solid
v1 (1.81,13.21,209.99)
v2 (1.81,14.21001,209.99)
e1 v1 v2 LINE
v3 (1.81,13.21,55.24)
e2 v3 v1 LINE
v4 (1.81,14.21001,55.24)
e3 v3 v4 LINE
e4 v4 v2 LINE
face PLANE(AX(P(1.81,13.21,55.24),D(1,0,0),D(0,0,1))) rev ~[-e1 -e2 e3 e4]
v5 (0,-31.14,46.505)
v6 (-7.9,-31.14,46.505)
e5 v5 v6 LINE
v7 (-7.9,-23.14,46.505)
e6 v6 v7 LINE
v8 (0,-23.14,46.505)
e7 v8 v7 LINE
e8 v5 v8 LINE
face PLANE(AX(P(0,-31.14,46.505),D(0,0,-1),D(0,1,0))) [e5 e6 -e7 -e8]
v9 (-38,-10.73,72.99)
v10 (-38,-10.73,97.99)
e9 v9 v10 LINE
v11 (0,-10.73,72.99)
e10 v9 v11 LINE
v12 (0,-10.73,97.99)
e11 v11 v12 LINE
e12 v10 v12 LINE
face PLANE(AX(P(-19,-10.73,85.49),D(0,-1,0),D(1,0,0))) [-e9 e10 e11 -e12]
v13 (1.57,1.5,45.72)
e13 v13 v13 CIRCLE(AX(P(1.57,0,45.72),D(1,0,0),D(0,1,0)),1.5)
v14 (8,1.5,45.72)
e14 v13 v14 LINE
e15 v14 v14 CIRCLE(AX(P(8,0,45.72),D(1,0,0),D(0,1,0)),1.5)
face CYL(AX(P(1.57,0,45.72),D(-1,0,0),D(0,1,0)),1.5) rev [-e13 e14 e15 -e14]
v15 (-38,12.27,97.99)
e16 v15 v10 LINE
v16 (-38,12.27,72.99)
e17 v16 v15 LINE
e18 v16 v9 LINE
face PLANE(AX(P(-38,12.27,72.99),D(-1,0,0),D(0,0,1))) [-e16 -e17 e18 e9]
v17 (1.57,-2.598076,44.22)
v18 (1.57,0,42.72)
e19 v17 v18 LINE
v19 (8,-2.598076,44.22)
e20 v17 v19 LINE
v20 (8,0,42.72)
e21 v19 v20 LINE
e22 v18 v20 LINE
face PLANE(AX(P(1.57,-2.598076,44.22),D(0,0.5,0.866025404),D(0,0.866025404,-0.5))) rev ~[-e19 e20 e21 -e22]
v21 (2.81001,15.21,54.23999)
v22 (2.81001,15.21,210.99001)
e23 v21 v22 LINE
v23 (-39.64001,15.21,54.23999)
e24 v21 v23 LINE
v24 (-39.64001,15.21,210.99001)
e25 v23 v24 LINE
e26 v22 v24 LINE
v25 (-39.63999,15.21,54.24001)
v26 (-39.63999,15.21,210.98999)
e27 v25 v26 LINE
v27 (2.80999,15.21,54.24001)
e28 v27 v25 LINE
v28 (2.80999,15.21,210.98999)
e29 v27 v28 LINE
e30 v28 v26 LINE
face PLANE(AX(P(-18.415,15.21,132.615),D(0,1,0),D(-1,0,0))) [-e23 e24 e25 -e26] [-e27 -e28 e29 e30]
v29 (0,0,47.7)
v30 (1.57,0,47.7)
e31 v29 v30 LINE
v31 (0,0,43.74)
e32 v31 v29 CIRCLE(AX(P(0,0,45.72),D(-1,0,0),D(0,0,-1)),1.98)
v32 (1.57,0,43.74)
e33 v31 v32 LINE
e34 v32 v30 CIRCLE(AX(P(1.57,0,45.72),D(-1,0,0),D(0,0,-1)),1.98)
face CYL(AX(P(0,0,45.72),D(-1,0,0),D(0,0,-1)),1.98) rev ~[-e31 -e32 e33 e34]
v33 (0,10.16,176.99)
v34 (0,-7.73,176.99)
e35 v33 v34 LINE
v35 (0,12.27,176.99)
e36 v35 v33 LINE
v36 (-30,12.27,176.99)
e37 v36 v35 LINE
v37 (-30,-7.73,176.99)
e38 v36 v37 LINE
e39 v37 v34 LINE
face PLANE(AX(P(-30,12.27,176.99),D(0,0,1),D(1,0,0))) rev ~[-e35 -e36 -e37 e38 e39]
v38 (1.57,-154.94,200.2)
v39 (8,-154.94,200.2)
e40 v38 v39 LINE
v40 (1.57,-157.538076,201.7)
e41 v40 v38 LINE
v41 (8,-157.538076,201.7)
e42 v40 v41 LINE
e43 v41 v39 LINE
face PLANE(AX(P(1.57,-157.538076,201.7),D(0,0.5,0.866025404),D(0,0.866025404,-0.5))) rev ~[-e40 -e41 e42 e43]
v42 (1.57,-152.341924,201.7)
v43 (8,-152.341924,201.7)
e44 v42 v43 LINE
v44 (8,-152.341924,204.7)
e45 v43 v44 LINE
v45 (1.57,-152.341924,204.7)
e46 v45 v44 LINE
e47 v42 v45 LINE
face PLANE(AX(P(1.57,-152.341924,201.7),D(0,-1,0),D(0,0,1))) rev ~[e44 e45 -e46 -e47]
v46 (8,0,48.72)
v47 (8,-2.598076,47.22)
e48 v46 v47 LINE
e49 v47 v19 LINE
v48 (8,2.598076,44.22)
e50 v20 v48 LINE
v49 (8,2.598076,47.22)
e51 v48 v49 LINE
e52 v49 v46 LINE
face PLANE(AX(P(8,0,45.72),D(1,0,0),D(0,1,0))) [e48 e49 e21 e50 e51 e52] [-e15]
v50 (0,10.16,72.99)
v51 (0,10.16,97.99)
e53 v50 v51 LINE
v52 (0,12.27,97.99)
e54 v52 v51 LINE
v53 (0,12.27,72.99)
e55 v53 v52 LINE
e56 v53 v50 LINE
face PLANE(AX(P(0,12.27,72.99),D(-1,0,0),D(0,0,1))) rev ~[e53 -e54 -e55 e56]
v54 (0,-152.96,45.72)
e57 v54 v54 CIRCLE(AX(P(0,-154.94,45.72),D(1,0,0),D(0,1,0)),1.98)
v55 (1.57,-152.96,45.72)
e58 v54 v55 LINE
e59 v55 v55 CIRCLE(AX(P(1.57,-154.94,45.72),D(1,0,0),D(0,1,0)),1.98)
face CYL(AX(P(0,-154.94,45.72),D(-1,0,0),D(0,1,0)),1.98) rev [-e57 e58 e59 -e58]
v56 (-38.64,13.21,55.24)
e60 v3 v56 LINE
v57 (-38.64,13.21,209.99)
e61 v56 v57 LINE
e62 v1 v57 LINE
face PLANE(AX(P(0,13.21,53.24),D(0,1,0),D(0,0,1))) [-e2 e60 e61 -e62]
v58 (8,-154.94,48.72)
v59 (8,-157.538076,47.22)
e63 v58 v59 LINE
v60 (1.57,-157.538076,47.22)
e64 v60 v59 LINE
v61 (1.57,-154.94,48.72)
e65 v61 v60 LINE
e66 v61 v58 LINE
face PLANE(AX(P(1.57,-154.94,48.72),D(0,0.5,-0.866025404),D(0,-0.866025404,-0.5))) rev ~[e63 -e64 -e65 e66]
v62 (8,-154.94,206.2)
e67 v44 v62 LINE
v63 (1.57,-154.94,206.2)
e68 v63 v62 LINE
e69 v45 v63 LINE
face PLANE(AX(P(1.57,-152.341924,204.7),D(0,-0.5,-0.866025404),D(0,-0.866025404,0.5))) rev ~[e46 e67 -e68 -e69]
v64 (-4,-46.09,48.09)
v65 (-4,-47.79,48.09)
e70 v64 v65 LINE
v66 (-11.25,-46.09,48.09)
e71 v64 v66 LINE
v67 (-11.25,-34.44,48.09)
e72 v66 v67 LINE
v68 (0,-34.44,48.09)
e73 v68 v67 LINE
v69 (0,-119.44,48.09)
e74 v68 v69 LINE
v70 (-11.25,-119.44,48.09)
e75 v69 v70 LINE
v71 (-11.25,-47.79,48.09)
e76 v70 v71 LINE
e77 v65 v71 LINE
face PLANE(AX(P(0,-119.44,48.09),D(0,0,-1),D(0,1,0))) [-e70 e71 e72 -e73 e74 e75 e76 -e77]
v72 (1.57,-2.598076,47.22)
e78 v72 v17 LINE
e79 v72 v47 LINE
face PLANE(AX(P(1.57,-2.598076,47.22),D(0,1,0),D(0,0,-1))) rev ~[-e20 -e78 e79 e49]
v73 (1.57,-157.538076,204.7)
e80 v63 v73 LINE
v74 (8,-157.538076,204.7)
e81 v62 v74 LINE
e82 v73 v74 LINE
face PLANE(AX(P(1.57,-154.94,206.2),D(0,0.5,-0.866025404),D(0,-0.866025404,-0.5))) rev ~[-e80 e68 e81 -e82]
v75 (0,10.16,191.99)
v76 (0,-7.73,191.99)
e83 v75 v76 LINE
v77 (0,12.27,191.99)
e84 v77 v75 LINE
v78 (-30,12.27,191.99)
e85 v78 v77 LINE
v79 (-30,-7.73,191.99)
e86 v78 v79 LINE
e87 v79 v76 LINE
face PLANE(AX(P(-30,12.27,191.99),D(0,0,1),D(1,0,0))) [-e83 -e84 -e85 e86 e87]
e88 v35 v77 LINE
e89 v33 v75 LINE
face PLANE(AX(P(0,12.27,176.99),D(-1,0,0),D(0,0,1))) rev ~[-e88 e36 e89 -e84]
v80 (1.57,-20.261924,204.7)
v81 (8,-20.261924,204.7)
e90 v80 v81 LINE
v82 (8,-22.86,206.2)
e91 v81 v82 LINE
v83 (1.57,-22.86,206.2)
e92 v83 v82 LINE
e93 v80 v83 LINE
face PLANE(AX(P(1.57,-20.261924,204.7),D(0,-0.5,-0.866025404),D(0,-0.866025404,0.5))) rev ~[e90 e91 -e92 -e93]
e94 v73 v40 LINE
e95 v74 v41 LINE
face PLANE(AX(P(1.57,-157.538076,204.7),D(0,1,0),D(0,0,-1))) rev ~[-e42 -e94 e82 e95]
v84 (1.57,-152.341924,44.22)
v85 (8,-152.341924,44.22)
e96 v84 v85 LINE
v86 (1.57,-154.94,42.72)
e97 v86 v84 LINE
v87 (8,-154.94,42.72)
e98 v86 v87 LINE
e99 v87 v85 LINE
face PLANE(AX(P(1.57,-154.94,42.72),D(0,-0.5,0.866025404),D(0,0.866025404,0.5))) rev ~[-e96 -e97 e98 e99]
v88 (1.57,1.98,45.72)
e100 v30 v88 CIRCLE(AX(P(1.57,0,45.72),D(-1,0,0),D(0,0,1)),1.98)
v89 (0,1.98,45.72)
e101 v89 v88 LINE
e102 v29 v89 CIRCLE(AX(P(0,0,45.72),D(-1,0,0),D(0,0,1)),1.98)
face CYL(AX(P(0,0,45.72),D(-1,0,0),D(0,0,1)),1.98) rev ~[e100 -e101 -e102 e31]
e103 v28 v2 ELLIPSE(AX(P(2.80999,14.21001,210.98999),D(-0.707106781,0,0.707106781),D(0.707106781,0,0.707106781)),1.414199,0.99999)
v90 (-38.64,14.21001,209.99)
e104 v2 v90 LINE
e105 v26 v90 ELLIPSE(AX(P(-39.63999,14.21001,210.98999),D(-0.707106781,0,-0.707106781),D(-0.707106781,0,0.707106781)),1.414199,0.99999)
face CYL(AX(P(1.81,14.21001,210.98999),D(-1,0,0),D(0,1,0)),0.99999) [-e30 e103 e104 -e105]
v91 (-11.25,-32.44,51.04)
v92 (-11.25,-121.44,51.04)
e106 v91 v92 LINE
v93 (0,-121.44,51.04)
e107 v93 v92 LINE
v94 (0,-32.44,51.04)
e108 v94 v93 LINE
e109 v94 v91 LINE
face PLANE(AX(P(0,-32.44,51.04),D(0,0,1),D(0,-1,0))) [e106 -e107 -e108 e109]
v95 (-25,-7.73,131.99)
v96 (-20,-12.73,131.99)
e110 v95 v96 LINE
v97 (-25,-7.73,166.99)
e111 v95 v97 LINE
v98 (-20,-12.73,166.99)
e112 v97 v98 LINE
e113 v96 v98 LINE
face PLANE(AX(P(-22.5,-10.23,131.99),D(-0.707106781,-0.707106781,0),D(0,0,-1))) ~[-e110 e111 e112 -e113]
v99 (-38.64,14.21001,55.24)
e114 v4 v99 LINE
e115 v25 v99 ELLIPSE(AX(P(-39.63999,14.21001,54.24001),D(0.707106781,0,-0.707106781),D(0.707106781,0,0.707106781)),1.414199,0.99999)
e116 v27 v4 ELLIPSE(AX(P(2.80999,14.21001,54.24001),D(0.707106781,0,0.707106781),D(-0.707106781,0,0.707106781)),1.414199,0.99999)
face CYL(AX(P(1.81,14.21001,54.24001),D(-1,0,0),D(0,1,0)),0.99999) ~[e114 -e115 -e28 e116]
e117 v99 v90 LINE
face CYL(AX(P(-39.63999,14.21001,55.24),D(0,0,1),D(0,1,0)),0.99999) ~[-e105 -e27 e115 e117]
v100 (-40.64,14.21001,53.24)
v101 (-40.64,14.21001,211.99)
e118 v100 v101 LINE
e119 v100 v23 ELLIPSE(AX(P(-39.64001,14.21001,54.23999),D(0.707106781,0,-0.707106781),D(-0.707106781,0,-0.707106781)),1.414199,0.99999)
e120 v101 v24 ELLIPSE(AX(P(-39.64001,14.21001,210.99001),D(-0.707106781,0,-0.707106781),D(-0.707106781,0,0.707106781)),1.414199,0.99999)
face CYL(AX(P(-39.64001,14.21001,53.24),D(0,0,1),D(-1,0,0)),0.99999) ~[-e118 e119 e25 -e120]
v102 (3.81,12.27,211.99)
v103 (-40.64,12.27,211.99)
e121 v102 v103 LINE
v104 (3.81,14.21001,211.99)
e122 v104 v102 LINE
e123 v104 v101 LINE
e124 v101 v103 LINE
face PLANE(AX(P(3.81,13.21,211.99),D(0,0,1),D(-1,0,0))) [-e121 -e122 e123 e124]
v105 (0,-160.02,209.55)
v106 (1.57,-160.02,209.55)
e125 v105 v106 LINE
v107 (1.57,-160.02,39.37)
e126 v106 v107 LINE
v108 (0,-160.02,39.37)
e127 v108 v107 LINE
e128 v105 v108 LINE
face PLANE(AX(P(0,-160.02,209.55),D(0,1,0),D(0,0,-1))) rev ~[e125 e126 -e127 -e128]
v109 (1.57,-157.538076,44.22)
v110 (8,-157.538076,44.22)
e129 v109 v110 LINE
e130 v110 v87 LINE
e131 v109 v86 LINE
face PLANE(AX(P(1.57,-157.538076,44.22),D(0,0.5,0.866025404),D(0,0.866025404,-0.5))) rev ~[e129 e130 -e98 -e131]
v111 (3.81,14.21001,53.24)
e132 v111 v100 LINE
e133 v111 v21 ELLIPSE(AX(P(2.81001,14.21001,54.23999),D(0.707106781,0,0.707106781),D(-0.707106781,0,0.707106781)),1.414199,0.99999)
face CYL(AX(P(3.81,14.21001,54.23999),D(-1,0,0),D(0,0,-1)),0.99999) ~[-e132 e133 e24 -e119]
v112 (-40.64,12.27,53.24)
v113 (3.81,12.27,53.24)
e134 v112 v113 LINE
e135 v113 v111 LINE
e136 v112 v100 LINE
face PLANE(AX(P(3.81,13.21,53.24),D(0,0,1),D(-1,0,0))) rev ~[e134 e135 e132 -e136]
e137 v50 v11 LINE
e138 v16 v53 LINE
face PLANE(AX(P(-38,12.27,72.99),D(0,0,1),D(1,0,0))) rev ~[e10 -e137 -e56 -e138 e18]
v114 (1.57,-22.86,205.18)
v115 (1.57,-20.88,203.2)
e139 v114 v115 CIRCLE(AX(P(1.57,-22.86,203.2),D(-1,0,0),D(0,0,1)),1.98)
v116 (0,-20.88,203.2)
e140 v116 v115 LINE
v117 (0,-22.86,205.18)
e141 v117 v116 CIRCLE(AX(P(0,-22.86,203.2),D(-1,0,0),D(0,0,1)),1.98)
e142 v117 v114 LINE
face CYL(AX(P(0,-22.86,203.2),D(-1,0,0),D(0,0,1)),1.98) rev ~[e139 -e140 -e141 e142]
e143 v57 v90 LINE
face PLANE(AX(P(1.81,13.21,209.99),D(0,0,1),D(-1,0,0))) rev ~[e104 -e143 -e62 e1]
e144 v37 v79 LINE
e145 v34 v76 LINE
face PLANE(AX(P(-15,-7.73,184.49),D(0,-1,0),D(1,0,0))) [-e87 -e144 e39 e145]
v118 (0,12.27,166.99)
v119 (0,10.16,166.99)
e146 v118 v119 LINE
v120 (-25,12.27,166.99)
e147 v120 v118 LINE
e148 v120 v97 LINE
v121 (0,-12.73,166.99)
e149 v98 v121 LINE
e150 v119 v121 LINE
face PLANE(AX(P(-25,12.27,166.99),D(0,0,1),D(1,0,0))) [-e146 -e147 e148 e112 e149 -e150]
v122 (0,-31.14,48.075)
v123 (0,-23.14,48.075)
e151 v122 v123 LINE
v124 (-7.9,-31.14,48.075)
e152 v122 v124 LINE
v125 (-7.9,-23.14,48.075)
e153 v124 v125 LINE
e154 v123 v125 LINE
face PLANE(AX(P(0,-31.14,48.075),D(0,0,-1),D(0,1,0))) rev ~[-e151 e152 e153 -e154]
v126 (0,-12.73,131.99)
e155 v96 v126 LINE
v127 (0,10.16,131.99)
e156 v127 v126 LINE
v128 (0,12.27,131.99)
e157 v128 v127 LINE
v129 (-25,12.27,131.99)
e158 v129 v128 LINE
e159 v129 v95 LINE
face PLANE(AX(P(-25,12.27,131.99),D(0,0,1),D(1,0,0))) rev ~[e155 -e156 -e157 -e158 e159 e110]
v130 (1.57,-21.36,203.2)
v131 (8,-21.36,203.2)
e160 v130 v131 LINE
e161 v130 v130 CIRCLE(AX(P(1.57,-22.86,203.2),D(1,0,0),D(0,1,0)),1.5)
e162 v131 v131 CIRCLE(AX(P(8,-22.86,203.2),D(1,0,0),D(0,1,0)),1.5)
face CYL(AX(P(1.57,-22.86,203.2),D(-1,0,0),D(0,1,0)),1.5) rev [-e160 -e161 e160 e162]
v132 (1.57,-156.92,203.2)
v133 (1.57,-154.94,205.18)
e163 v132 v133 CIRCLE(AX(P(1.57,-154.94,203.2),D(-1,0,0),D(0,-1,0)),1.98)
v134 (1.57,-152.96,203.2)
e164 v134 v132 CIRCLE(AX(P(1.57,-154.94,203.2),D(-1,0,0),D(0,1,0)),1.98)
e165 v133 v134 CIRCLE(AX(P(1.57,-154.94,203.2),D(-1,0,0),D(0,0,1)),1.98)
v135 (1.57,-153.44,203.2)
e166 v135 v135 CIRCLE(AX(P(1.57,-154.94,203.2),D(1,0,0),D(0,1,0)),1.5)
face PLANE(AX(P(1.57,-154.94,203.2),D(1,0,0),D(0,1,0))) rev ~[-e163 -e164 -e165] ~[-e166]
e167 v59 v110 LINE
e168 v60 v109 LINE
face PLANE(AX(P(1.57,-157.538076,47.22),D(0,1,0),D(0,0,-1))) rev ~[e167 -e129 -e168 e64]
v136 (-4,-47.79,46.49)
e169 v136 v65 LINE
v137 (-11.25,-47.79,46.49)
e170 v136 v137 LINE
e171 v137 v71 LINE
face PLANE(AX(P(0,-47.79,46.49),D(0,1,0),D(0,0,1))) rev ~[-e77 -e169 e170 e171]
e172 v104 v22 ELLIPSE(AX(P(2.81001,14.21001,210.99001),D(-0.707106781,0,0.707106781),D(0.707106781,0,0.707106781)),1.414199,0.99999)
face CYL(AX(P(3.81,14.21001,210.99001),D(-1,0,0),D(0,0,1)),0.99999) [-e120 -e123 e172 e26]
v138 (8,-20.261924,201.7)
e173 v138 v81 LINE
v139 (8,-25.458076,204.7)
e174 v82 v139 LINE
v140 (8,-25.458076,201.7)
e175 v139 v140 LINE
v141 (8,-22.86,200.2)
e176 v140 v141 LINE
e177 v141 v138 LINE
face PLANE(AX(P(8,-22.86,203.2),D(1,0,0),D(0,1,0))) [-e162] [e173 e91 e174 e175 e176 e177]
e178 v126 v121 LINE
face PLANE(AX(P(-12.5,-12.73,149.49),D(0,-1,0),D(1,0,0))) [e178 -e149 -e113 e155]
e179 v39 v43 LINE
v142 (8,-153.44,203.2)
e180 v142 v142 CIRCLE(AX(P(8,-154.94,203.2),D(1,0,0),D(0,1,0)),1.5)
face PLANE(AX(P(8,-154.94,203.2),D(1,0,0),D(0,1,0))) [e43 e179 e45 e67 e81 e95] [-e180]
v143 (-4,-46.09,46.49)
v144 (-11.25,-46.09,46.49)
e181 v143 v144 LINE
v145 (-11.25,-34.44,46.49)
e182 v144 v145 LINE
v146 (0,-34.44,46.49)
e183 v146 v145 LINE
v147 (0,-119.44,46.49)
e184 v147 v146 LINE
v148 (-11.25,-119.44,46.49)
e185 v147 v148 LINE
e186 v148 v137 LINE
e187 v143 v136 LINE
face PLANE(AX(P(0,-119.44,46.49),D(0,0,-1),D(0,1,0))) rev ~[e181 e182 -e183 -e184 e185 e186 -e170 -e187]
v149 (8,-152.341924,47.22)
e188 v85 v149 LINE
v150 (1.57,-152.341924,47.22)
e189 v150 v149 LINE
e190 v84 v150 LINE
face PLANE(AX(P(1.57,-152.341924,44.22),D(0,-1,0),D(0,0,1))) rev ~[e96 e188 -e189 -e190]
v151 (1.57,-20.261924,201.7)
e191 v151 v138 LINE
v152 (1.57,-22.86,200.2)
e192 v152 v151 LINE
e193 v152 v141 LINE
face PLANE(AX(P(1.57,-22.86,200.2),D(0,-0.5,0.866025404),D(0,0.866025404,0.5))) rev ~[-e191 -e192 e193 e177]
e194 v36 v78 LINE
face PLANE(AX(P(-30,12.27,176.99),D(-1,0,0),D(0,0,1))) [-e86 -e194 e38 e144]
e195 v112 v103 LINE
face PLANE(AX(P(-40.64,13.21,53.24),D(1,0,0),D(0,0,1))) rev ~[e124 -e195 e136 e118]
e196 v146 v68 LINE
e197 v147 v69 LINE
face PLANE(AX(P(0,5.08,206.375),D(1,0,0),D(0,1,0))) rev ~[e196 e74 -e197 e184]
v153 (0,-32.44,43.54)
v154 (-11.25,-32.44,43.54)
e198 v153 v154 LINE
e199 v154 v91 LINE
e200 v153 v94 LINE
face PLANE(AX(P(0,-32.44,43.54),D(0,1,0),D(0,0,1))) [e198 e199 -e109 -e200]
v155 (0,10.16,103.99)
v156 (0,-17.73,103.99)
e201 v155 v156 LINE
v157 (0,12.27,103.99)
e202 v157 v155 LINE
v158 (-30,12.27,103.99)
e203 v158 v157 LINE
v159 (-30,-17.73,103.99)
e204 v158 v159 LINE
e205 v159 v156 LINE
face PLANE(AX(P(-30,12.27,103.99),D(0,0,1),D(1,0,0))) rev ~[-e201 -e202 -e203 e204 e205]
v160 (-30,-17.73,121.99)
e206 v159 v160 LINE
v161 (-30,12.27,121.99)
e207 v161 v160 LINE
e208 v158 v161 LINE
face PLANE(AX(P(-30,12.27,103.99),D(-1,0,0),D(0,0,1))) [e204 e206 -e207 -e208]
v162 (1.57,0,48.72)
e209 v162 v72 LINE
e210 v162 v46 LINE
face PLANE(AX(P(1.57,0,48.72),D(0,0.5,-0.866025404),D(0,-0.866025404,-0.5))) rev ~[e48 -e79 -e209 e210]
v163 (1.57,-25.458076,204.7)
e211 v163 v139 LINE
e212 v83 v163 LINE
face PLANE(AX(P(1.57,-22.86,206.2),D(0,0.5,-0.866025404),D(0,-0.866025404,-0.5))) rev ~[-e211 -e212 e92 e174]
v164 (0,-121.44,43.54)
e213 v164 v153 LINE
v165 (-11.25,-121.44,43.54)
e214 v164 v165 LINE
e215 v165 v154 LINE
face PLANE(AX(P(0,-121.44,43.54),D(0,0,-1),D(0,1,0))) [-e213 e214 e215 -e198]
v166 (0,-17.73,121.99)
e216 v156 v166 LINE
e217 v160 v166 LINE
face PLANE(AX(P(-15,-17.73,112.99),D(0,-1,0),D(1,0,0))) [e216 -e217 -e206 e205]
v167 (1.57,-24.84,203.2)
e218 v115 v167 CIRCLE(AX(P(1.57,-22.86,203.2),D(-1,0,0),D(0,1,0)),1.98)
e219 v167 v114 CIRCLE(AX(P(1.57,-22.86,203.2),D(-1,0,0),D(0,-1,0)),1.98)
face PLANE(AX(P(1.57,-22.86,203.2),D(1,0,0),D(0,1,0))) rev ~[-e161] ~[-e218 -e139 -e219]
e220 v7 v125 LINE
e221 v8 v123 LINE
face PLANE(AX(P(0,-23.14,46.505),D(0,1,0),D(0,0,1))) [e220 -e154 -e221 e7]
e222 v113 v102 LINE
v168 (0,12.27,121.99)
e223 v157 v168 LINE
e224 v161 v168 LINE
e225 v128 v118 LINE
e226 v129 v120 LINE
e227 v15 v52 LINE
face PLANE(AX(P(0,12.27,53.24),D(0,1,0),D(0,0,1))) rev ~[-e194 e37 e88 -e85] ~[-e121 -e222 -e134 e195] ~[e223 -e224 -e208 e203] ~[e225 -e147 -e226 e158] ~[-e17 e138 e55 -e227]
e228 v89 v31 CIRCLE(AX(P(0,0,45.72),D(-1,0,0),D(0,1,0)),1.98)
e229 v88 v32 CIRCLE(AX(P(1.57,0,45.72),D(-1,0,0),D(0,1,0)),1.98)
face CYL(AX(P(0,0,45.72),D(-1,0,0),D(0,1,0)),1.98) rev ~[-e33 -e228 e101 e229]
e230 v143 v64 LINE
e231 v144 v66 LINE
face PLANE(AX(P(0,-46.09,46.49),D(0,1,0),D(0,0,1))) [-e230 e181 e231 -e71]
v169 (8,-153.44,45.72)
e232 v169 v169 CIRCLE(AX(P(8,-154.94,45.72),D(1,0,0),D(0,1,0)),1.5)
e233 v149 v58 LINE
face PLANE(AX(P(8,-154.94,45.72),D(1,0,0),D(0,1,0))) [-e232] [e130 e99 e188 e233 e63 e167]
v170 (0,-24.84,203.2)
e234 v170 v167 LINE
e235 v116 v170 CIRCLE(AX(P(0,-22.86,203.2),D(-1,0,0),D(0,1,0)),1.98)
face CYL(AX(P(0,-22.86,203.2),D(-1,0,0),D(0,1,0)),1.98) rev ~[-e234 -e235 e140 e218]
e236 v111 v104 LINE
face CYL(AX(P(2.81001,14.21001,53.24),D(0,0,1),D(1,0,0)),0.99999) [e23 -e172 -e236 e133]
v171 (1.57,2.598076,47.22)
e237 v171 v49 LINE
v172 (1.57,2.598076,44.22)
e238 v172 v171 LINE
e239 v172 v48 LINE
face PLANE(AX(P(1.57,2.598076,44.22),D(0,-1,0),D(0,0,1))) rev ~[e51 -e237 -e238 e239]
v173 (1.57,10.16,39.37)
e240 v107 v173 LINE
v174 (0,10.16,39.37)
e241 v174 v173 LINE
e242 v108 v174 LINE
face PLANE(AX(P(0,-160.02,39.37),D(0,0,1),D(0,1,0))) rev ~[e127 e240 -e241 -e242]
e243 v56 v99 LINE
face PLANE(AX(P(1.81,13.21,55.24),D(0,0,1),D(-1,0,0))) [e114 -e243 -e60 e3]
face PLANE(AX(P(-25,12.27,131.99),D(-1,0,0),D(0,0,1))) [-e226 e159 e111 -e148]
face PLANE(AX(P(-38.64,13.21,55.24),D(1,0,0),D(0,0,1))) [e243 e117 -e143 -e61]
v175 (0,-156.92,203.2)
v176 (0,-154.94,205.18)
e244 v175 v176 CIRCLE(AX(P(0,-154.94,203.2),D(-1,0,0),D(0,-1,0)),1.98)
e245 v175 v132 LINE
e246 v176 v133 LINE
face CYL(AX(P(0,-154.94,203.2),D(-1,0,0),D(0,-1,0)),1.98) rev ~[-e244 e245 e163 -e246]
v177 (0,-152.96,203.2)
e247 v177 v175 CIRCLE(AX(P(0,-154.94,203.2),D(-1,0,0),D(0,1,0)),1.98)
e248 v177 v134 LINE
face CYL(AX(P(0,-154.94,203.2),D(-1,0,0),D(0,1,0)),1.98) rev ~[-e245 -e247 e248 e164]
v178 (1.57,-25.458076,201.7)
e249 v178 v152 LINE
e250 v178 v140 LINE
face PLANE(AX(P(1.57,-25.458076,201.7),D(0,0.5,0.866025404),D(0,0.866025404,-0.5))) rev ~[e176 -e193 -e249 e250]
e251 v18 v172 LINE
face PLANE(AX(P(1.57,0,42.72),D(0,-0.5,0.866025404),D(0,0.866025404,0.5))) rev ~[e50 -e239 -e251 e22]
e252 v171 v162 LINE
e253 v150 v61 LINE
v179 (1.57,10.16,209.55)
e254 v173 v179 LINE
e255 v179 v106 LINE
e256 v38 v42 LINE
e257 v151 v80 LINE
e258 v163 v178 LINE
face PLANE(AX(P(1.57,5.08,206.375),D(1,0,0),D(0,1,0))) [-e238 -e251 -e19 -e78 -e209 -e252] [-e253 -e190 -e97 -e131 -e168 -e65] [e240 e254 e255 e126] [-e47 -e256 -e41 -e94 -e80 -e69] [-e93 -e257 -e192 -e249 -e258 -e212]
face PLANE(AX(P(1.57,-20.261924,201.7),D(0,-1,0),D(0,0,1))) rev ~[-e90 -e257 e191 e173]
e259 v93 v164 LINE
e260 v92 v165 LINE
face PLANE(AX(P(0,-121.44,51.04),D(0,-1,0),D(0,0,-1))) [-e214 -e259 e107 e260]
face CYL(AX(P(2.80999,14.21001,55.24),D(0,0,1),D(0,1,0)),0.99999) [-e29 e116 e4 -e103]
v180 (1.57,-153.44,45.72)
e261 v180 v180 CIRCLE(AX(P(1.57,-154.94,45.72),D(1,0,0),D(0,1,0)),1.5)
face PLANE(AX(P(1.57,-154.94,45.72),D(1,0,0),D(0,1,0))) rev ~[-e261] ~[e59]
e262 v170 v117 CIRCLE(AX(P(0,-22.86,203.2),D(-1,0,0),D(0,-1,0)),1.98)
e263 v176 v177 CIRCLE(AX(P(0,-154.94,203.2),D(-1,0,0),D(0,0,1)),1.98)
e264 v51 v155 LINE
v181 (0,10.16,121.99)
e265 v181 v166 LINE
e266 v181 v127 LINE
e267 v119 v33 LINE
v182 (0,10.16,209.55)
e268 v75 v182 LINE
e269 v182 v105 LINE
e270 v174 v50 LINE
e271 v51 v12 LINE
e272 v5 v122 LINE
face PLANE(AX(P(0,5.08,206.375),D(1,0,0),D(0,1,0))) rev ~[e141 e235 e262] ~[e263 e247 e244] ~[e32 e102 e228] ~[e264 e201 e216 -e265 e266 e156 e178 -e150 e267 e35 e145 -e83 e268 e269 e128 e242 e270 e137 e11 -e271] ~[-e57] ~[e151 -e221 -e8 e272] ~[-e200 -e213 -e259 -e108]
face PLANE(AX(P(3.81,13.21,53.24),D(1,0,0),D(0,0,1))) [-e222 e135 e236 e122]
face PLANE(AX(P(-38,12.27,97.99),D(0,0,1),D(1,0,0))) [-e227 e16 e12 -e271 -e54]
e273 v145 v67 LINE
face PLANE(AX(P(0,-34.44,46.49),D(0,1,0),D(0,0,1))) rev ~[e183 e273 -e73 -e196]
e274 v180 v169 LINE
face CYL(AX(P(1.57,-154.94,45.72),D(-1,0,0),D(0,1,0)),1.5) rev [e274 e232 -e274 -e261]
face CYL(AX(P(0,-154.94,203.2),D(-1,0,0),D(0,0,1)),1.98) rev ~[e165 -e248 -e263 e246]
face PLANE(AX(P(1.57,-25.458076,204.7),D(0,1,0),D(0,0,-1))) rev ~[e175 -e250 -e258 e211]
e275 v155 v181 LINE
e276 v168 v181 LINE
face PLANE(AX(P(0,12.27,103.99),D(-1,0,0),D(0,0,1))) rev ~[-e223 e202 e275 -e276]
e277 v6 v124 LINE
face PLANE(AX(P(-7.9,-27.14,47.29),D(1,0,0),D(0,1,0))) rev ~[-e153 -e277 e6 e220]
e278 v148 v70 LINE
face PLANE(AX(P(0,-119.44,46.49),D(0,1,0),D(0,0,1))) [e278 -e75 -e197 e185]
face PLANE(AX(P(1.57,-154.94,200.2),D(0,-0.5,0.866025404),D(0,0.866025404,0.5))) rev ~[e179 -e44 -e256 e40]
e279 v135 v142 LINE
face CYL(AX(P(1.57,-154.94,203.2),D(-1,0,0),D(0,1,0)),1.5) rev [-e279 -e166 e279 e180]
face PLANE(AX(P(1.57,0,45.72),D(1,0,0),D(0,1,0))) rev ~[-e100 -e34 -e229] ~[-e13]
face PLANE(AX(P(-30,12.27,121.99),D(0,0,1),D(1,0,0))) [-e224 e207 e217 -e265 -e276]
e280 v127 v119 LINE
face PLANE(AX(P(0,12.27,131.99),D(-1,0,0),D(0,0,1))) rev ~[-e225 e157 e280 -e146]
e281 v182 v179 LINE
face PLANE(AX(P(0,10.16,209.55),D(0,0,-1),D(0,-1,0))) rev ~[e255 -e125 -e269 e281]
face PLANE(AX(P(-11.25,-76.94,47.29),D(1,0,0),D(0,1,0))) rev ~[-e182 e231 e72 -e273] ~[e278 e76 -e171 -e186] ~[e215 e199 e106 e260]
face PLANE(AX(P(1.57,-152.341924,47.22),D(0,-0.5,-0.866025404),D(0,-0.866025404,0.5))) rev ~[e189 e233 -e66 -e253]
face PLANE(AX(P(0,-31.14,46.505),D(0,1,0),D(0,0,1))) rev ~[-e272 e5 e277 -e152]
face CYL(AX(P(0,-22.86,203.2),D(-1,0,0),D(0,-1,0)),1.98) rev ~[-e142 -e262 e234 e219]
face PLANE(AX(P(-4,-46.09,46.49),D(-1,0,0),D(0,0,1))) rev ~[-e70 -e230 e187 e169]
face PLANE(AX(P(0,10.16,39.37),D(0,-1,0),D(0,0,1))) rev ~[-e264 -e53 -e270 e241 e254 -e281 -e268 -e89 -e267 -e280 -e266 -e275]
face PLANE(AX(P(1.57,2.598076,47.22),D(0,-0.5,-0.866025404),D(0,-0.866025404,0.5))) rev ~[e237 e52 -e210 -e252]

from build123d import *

# Parameters (mm, degrees)
F0_W          = 10.16
F0_H          = 6.35
F0_R          = 1.98
F0_W_2        = 8
F0_H_2        = 1.57
F0_W_3        = 71.65
F0_H_3        = 1.6
F0_W_4        = 11.65
F1_DEPTH      = 1.57
F2_DEPTH      = 11.25
F3_R          = 1.5
F4_DEPTH      = 6.43
F0_W_5        = 0.94
F0_H_4        = 158.75
F5_DEPTH      = 3.81
F5_DEPTH_BACK = 40.64
F6_W          = 44.45
F6_H          = 158.75
F6_W_2        = 40.45
F6_H_2        = 154.75
F7_DEPTH      = 2
F8_R          = 0.99999
F9_W          = 30
F9_H          = 15
F10_DEPTH     = 20
F9_W_2        = 25
F9_H_2        = 35
F11_DEPTH     = 25
F9_H_3        = 18
F12_DEPTH     = 30
F9_W_3        = 38
F9_H_4        = 25
F13_DEPTH     = 23
F14_SIZE      = 5
F15_W         = 4
F15_H         = 1.6
F16_DEPTH     = 2
F17_DEPTH     = 7.9


# Not quite as in the source:
# - a fillet or chamfer is up to 0.001 mm smaller than in the source, because OpenCascade refuses the exact size


with BuildPart() as f1:
    # F0 (on Right) → F1 (new body)
    with BuildSketch(Plane.YZ):
        with Locations((5.08, 206.375)):
            Rectangle(F0_W, F0_H)
        with BuildLine():
            Line((0, 203.2), (0, 209.55))
            Line((0, 209.55), (-22.86, 209.55))
            Line((-22.86, 209.55), (-22.86, 205.18))
            ThreePointArc((-22.86, 205.18), (-21.4599285733, 204.6000714267), (-20.88, 203.2))
            Line((-20.88, 203.2), (0, 203.2))
        make_face()
        with BuildLine():
            Line((-22.86, 205.18), (-22.86, 209.55))
            Line((-22.86, 209.55), (-154.94, 209.55))
            Line((-154.94, 209.55), (-154.94, 205.18))
            ThreePointArc((-154.94, 205.18), (-153.5399285733, 204.6000714267), (-152.96, 203.2))
            Line((-152.96, 203.2), (-24.84, 203.2))
            ThreePointArc((-24.84, 203.2), (-24.2600714267, 204.6000714267), (-22.86, 205.18))
        make_face()
        with BuildLine():
            Line((-154.94, 205.18), (-154.94, 209.55))
            Line((-154.94, 209.55), (-160.02, 209.55))
            Line((-160.02, 209.55), (-160.02, 203.2))
            Line((-160.02, 203.2), (-156.92, 203.2))
            ThreePointArc((-156.92, 203.2), (-156.3400714267, 204.6000714267), (-154.94, 205.18))
        make_face()
        with BuildLine():
            Line((0, 47.7), (0, 203.2))
            Line((0, 203.2), (-20.88, 203.2))
            ThreePointArc((-20.88, 203.2), (-22.86, 201.22), (-24.84, 203.2))
            Line((-24.84, 203.2), (-152.96, 203.2))
            ThreePointArc((-152.96, 203.2), (-154.94, 201.22), (-156.92, 203.2))
            Line((-156.92, 203.2), (-160.02, 203.2))
            Line((-160.02, 203.2), (-160.02, 39.37))
            Line((-160.02, 39.37), (0, 39.37))
            Line((0, 39.37), (0, 43.74))
            ThreePointArc((0, 43.74), (-1.98, 45.72), (0, 47.7))
        make_face()
        with Locations((-154.94, 45.72)):
            Circle(F0_R, mode=Mode.SUBTRACT)
        Polygon((-121.44, 51.04), (-46.94, 51.04), (-32.44, 51.04), (-32.44, 43.54), (-46.94, 43.54), (-121.44, 43.54), align=None, mode=Mode.SUBTRACT)
        with Locations((-27.14, 47.29)):
            Rectangle(F0_W_2, F0_H_2, mode=Mode.SUBTRACT)
        with BuildLine():
            Line((10.16, 45.72), (10.16, 203.2))
            Line((10.16, 203.2), (0, 203.2))
            Line((0, 203.2), (0, 47.7))
            ThreePointArc((0, 47.7), (1.4000714267, 47.1200714267), (1.98, 45.72))
            Line((1.98, 45.72), (10.16, 45.72))
        make_face()
        with BuildLine():
            Line((10.16, 39.37), (10.16, 45.72))
            Line((10.16, 45.72), (1.98, 45.72))
            ThreePointArc((1.98, 45.72), (1.4000714267, 44.3199285733), (0, 43.74))
            Line((0, 43.74), (0, 39.37))
            Line((0, 39.37), (10.16, 39.37))
        make_face()
        Polygon((-32.44, 51.04), (-46.94, 51.04), (-121.44, 51.04), (-121.44, 43.54), (-46.94, 43.54), (-32.44, 43.54), align=None)
        with Locations((-83.615, 47.29)):
            Rectangle(F0_W_3, F0_H_3, mode=Mode.SUBTRACT)
        with Locations((-40.265, 47.29)):
            Rectangle(F0_W_4, F0_H_3, mode=Mode.SUBTRACT)
        with Locations((-40.265, 47.29)):
            Rectangle(F0_W_4, F0_H_3)
        with Locations((-83.615, 47.29)):
            Rectangle(F0_W_3, F0_H_3)
        with Locations((-27.14, 47.29)):
            Rectangle(F0_W_2, F0_H_2)
    extrude(amount=F1_DEPTH)

    # F0 (on Right) → F2 (join)
    with BuildSketch(Plane.YZ):
        Polygon((-32.44, 51.04), (-46.94, 51.04), (-121.44, 51.04), (-121.44, 43.54), (-46.94, 43.54), (-32.44, 43.54), align=None)
        with Locations((-83.615, 47.29)):
            Rectangle(F0_W_3, F0_H_3, mode=Mode.SUBTRACT)
        with Locations((-40.265, 47.29)):
            Rectangle(F0_W_4, F0_H_3, mode=Mode.SUBTRACT)
    extrude(amount=-F2_DEPTH)

    # F3 (on face) → F4 (join)
    with BuildSketch(Plane.YZ.offset(1.57)):
        Polygon((-154.94, 200.2), (-152.3419237886, 201.7), (-152.3419237886, 204.7), (-154.94, 206.2), (-157.5380762114, 204.7), (-157.5380762114, 201.7), align=None)
        with Locations((-154.94, 203.2)):
            Circle(F3_R, mode=Mode.SUBTRACT)
        Polygon((-154.94, 42.72), (-152.3419237886, 44.22), (-152.3419237886, 47.22), (-154.94, 48.72), (-157.5380762114, 47.22), (-157.5380762114, 44.22), align=None)
        with Locations((-154.94, 45.72)):
            Circle(F3_R, mode=Mode.SUBTRACT)
        Polygon((0, 42.72), (2.5980762114, 44.22), (2.5980762114, 47.22), (0, 48.72), (-2.5980762114, 47.22), (-2.5980762114, 44.22), align=None)
        with Locations((0, 45.72)):
            Circle(F3_R, mode=Mode.SUBTRACT)
        Polygon((-22.86, 200.2), (-20.2619237886, 201.7), (-20.2619237886, 204.7), (-22.86, 206.2), (-25.4580762114, 204.7), (-25.4580762114, 201.7), align=None)
        with Locations((-22.86, 203.2)):
            Circle(F3_R, mode=Mode.SUBTRACT)
    extrude(amount=F4_DEPTH)



with BuildPart() as f5:
    # F0 (on Right) → F5 (new body, two sides)
    with BuildSketch(Plane.YZ) as f5_sk:
        with Locations((12.74, 132.615)):
            Rectangle(F0_W_5, F0_H_4)
    extrude(amount=F5_DEPTH)
    extrude(f5_sk.sketch, amount=-F5_DEPTH_BACK)

    # F6 (on face) → F7 (join)
    with BuildSketch(Plane(origin=(0, 13.21, 0), x_dir=(-1, 0, 0), z_dir=(0, 1, 0))):
        with Locations((18.415, 132.615)):
            Rectangle(F6_W, F6_H)
        with Locations((18.415, 132.615)):
            Rectangle(F6_W_2, F6_H_2, mode=Mode.SUBTRACT)
    extrude(amount=F7_DEPTH)

    # F8 (radius 1 in the source; OpenCascade refuses exactly that, so slightly less here)
    f8_edges = [f5.edges().sort_by_distance(p)[0] for p in [
        (1.81, 15.21, 132.615),
        (-18.415, 15.21, 209.99),
        (-38.64, 15.21, 132.615),
        (-18.415, 15.21, 55.24),
        (-18.415, 15.21, 53.24),
        (-40.64, 15.21, 132.615),
        (3.81, 15.21, 132.615),
        (-18.415, 15.21, 211.99),
    ]]
    fillet(f8_edges, radius=F8_R)


with BuildPart() as f1_1:
    add(f1.part)

    add(f5.part)  # F10 merges F5
    # F9 (on face) → F10 (join)
    with BuildSketch(Plane.XZ.offset(-12.27)):
        with Locations((-15, 184.49)):
            Rectangle(F9_W, F9_H)
    extrude(amount=F10_DEPTH)

    # F9 (on face) → F11 (join)
    with BuildSketch(Plane.XZ.offset(-12.27)):
        with Locations((-12.5, 149.49)):
            Rectangle(F9_W_2, F9_H_2)
    extrude(amount=F11_DEPTH)

    # F9 (on face) → F12 (join)
    with BuildSketch(Plane.XZ.offset(-12.27)):
        with Locations((-15, 112.99)):
            Rectangle(F9_W, F9_H_3)
    extrude(amount=F12_DEPTH)

    # F9 (on face) → F13 (join)
    with BuildSketch(Plane.XZ.offset(-12.27)):
        with Locations((-19, 85.49)):
            Rectangle(F9_W_3, F9_H_4)
    extrude(amount=F13_DEPTH)

    # F14
    f14_edges = [f1_1.edges().sort_by_distance(p)[0] for p in [
        (-25, -12.73, 149.49),
    ]]
    chamfer(f14_edges, length=F14_SIZE)

    # F15 (on face) → F16 (cut)
    with BuildSketch(Plane(origin=(0, -46.09, 0), x_dir=(-1, 0, 0), z_dir=(0, 1, 0))):
        with Locations((2, 47.29)):
            Rectangle(F15_W, F15_H)
    extrude(amount=-F16_DEPTH, mode=Mode.SUBTRACT)

    # F0 (on Right) → F17 (join)
    with BuildSketch(Plane.YZ):
        with Locations((-27.14, 47.29)):
            Rectangle(F0_W_2, F0_H_2)
    extrude(amount=-F17_DEPTH)


solid = f1_1.part
